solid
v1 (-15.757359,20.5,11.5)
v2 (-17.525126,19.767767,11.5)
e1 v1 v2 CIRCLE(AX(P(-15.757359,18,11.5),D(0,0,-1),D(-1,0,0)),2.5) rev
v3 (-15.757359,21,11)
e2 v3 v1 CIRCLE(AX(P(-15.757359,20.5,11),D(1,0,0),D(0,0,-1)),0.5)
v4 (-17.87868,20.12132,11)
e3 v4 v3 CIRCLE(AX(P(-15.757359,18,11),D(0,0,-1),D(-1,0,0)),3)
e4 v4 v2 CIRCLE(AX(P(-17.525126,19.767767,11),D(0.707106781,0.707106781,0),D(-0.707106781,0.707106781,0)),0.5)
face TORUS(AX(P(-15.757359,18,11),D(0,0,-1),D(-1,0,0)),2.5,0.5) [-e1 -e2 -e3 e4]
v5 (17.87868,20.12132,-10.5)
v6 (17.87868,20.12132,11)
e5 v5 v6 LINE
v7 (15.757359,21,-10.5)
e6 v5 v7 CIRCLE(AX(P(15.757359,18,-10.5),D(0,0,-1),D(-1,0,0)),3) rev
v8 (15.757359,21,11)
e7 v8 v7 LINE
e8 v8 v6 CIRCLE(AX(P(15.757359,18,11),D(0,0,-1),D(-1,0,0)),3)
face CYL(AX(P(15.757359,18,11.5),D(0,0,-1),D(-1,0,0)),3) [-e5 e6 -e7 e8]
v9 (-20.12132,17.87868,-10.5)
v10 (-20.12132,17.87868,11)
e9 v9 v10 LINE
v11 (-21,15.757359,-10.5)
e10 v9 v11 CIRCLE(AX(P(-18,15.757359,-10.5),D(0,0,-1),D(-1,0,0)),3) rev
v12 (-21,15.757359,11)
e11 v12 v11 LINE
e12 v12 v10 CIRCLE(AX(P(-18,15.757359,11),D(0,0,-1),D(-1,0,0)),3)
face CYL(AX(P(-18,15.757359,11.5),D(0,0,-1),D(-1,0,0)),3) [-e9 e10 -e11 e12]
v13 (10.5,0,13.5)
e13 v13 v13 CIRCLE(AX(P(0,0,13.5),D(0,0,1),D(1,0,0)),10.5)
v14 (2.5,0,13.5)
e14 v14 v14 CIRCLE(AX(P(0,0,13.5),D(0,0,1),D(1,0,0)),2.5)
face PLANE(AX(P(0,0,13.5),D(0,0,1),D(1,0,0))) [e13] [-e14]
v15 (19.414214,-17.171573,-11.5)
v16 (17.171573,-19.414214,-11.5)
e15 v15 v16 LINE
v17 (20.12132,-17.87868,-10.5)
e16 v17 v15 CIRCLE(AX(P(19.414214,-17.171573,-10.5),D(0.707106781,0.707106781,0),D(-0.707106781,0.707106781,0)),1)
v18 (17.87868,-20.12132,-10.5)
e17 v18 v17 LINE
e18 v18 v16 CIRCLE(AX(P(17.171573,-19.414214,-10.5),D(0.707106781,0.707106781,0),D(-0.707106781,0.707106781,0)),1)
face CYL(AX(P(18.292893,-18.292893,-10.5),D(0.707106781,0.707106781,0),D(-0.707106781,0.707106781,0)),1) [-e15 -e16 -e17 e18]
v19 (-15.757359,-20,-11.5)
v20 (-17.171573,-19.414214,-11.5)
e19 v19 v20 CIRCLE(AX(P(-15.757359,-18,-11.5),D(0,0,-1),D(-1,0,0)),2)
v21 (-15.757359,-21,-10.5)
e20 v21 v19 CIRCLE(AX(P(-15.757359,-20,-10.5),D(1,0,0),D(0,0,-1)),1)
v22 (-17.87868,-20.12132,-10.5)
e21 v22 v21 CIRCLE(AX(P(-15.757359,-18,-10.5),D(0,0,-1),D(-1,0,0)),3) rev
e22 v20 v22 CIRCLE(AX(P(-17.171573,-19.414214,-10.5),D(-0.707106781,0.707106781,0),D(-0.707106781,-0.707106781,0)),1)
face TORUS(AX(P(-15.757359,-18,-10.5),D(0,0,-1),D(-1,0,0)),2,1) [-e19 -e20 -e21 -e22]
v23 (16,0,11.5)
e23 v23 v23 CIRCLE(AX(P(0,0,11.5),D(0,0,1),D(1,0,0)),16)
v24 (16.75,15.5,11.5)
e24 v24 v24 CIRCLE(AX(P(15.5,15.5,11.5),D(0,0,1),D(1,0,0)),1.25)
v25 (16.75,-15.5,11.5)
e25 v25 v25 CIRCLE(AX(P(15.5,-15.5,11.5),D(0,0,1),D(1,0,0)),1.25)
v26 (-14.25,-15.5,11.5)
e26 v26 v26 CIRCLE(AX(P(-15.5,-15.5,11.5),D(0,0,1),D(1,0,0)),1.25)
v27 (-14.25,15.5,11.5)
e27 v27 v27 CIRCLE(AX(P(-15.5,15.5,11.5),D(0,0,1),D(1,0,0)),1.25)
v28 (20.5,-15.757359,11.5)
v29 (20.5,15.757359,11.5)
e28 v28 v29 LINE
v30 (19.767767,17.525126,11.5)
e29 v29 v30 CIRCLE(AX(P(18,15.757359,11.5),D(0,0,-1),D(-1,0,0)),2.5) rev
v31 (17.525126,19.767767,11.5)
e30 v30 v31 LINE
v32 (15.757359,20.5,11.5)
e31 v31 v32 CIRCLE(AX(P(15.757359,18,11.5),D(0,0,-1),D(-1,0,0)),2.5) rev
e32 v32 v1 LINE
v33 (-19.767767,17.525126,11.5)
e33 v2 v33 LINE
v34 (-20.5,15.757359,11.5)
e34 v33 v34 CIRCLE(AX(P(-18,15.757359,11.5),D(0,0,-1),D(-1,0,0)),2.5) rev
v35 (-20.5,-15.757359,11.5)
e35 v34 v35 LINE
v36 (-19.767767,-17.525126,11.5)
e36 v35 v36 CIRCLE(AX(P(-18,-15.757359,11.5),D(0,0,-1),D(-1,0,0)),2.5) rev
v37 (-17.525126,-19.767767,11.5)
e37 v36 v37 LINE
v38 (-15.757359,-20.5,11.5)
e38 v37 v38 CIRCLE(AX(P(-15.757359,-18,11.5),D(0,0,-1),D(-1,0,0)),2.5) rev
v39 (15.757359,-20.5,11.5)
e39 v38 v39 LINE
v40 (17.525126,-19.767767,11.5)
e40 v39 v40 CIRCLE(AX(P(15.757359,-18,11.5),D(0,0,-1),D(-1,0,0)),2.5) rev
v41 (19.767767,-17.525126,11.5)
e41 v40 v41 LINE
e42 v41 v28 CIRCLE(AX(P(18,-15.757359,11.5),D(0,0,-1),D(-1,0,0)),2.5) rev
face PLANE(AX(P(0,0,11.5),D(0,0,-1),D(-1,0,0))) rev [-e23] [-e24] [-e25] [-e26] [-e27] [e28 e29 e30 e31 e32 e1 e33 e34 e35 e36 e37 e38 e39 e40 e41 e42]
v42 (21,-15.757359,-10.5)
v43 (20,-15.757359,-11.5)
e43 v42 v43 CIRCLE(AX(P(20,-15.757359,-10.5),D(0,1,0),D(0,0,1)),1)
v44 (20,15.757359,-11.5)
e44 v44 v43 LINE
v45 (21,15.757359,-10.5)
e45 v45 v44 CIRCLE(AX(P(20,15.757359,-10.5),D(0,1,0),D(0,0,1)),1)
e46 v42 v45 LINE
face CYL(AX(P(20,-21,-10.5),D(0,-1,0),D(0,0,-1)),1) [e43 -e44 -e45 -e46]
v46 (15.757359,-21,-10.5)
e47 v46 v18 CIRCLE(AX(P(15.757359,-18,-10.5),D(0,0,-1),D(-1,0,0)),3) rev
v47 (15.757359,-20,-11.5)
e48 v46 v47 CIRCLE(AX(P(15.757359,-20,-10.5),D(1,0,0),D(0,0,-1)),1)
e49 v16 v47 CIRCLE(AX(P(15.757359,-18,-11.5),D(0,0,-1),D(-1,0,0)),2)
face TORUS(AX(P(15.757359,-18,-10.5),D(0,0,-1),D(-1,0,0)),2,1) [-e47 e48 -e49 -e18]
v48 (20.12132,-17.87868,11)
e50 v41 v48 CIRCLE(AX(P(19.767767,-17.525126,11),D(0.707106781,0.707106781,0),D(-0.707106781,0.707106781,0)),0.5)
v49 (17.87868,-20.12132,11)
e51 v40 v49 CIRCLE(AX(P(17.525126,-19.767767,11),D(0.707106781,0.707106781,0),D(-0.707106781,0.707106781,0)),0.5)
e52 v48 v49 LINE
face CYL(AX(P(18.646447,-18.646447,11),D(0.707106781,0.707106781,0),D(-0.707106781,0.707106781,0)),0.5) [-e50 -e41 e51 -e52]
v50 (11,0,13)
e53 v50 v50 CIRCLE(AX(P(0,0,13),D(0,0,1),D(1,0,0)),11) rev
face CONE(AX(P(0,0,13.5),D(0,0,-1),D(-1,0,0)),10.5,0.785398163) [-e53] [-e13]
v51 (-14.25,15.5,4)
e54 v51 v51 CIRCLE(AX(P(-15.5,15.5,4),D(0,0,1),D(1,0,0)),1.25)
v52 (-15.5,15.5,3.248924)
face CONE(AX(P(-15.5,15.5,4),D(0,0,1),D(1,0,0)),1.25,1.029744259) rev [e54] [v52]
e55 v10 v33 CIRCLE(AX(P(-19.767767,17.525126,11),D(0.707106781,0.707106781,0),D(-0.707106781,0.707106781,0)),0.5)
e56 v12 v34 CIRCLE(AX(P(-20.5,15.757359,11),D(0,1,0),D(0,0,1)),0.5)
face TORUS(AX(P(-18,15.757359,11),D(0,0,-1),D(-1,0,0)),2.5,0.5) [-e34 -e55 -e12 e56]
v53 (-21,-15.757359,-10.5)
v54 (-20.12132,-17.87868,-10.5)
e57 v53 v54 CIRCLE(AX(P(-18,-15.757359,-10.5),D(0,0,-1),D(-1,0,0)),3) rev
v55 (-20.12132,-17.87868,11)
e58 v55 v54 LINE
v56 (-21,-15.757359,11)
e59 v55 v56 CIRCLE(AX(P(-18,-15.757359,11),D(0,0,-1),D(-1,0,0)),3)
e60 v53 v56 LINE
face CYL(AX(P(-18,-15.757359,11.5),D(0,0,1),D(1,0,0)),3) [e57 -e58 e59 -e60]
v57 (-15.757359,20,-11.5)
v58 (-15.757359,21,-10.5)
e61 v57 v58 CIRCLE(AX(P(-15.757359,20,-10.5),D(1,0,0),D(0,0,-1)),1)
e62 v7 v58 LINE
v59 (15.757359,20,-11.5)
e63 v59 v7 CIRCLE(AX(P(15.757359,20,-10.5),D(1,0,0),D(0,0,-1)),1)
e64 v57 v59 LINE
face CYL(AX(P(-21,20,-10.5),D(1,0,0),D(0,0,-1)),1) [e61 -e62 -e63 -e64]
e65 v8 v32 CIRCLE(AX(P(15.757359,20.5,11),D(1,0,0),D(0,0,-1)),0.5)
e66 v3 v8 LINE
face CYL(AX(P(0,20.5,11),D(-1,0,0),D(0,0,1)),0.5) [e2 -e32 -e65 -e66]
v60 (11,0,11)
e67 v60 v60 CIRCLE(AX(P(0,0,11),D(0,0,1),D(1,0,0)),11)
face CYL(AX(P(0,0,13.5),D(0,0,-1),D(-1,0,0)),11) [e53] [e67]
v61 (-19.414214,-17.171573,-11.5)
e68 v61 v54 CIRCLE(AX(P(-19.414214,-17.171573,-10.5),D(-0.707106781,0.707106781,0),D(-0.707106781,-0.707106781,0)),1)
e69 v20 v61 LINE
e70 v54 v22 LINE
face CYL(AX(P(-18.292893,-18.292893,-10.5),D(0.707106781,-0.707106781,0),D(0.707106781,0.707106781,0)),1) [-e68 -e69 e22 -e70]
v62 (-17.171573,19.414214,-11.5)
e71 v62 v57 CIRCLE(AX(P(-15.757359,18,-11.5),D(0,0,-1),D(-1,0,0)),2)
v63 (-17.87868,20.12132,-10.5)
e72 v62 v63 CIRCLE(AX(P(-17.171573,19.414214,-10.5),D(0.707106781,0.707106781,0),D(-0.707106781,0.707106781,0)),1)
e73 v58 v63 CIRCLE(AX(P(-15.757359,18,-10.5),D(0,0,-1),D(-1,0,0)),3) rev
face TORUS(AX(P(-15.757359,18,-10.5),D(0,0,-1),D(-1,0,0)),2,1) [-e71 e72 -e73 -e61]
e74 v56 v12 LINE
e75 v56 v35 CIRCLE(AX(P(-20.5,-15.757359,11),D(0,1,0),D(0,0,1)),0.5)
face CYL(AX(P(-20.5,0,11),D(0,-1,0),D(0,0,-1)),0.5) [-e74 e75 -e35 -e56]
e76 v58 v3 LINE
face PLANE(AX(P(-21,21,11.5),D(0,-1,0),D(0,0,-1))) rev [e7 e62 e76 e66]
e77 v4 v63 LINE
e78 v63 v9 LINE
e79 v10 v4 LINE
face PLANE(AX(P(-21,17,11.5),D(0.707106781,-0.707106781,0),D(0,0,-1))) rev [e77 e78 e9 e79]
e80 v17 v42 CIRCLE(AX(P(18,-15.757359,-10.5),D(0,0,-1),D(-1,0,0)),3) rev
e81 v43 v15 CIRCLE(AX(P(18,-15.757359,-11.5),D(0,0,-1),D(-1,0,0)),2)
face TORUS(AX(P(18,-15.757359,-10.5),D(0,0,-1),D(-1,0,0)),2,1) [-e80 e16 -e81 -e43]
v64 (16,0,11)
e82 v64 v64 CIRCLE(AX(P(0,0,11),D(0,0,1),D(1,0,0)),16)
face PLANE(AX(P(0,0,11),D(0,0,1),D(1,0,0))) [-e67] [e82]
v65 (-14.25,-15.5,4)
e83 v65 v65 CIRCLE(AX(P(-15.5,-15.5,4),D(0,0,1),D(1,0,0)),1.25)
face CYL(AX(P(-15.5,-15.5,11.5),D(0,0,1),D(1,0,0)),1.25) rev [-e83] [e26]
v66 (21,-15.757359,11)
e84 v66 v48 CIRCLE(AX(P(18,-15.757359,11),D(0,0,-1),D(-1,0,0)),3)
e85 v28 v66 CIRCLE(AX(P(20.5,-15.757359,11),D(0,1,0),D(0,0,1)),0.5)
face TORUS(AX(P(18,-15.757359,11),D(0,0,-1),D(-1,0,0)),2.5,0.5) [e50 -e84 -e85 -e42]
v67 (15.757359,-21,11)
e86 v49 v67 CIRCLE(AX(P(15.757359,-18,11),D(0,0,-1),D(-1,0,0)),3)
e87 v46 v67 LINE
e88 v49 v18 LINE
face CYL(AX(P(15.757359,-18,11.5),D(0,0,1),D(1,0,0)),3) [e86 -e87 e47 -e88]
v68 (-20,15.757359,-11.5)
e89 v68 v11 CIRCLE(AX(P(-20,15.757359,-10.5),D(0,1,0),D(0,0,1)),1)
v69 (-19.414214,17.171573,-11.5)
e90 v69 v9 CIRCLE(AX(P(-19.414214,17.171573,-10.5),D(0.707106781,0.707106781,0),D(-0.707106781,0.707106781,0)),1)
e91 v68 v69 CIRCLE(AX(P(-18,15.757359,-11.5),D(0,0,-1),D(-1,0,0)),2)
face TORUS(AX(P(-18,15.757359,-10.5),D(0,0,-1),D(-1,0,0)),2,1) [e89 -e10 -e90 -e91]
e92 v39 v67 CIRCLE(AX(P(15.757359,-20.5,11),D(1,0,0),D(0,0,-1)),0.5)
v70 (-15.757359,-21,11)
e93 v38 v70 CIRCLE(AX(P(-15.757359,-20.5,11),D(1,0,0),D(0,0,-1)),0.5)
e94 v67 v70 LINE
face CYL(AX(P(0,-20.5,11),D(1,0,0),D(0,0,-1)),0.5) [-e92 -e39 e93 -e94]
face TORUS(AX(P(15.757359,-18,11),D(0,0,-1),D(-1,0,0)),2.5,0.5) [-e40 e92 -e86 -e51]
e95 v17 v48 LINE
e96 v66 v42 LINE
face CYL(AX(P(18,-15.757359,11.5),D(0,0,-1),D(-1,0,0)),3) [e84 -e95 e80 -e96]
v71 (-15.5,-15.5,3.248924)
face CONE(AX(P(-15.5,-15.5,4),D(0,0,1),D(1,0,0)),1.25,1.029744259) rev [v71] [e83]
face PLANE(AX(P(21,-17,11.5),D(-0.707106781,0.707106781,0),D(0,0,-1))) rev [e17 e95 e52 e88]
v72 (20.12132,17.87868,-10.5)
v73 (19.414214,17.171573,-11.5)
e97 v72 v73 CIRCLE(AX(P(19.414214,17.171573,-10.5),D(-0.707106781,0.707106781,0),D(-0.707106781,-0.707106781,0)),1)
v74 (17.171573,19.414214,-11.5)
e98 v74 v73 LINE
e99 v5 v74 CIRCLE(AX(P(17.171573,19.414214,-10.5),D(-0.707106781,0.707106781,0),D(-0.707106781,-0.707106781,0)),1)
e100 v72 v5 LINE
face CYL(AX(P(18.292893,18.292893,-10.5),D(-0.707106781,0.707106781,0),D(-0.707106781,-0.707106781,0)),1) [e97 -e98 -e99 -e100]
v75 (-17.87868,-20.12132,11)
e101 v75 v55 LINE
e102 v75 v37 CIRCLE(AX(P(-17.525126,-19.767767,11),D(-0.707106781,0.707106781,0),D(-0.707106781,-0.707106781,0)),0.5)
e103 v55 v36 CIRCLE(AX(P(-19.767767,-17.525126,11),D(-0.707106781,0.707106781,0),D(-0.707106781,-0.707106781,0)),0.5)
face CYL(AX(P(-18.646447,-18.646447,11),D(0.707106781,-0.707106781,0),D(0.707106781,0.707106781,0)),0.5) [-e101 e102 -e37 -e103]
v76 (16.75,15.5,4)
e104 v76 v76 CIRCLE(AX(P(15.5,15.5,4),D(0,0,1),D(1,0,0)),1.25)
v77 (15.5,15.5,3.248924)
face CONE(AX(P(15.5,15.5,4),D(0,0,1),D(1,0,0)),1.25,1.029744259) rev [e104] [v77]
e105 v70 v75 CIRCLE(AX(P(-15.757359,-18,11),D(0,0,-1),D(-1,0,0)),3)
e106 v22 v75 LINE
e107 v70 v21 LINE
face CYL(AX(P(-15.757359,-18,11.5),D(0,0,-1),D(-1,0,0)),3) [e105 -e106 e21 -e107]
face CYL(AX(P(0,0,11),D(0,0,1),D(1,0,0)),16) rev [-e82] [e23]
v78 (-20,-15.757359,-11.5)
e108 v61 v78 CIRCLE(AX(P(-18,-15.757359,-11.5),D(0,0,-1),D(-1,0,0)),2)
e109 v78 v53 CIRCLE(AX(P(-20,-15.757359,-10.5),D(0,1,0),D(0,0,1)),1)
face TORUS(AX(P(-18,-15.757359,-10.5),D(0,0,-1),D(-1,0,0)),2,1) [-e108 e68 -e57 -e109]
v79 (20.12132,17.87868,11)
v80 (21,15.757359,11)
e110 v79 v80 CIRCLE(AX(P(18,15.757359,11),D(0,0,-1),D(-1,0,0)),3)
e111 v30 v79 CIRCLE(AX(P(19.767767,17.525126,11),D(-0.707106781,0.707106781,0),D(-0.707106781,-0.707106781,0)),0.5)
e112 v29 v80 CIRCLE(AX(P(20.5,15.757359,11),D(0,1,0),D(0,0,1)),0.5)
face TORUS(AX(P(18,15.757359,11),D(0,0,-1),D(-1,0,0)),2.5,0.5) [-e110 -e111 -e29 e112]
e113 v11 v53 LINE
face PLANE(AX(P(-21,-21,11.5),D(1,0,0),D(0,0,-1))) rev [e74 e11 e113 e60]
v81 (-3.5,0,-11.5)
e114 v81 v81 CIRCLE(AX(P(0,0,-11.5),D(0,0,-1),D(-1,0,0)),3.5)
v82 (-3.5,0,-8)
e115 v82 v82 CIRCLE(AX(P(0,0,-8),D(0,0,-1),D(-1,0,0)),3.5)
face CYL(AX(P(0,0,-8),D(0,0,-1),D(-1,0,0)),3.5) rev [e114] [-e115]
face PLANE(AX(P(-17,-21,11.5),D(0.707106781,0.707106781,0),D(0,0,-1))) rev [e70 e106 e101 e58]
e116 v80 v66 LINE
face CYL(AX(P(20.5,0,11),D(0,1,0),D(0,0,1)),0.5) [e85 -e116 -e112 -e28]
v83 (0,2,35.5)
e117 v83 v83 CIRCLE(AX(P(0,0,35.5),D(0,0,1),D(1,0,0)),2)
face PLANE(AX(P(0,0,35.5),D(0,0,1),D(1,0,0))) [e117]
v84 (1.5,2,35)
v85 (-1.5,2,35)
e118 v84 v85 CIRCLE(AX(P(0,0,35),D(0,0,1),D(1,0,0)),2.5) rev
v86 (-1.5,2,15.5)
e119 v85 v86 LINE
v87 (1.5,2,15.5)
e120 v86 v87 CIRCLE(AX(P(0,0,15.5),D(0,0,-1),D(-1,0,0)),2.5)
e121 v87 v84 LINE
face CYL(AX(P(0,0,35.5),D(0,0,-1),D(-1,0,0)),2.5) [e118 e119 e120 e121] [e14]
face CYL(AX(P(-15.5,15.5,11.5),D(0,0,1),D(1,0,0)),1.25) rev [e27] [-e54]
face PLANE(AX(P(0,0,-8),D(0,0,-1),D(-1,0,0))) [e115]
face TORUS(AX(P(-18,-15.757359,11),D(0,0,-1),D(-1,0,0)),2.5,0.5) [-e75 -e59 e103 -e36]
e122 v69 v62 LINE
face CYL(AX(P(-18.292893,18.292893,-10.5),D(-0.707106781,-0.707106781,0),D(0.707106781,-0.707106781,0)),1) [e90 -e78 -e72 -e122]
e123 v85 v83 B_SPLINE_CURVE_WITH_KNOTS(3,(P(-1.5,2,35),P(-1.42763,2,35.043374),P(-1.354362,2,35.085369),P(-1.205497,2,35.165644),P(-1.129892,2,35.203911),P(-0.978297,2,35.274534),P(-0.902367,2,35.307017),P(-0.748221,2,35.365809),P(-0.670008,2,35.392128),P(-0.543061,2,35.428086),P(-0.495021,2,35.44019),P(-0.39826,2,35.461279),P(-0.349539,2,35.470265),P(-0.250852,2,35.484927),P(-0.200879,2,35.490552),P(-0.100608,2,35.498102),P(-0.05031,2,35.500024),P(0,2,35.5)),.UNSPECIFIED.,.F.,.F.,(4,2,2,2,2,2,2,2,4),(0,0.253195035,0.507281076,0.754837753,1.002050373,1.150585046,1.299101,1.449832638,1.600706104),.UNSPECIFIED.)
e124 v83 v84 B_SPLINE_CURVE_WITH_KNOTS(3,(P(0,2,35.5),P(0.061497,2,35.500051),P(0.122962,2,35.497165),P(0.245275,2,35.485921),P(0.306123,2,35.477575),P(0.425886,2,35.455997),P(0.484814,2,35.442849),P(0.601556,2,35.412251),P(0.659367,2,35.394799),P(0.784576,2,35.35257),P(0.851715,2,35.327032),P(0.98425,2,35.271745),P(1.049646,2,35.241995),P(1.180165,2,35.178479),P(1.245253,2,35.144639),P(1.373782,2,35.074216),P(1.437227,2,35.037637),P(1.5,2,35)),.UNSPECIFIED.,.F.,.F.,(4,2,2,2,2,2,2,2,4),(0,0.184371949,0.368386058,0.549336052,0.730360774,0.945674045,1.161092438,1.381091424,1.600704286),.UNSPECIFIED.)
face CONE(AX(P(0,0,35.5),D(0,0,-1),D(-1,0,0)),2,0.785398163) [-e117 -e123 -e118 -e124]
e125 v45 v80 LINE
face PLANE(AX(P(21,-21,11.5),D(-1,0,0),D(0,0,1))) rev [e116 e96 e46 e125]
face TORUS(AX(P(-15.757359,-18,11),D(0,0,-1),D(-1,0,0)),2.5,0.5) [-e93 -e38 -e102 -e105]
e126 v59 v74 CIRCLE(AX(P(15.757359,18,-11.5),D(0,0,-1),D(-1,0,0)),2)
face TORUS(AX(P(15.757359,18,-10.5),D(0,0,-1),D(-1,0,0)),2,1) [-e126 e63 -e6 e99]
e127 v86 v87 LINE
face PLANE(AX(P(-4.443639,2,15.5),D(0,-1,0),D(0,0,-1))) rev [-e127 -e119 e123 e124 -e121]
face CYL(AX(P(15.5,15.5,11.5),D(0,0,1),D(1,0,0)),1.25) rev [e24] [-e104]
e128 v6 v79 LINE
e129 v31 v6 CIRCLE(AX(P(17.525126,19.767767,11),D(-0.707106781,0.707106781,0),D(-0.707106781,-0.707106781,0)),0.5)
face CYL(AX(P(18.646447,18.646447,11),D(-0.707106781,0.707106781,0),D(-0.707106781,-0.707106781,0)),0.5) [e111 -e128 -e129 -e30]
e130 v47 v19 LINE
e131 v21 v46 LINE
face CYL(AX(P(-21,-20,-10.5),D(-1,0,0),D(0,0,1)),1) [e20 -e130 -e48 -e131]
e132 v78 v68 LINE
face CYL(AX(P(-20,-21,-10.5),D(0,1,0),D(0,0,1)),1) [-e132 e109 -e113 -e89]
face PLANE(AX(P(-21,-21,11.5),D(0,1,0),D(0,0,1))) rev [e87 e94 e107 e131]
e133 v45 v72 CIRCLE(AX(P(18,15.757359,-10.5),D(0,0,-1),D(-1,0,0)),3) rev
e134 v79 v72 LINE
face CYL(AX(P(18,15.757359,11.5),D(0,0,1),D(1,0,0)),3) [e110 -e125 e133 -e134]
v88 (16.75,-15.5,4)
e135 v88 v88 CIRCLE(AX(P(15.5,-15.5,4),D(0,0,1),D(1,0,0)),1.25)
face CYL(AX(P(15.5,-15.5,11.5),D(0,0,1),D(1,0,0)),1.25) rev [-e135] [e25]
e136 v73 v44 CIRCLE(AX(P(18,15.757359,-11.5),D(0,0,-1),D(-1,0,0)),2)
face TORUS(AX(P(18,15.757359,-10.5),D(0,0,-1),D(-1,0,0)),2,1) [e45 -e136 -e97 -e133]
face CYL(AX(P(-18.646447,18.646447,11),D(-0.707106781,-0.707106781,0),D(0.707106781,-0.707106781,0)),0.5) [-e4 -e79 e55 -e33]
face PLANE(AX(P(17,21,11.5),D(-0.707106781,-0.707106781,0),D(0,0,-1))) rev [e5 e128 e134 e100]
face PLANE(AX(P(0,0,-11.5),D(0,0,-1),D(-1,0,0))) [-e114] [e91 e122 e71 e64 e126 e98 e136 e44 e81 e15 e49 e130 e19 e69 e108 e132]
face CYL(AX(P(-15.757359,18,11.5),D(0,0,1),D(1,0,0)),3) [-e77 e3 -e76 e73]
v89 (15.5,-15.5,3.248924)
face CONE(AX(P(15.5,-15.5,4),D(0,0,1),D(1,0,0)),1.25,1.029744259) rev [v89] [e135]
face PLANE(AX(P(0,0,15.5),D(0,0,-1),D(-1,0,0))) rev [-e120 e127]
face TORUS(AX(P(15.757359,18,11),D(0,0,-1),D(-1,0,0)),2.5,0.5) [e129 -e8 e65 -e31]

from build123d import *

# Parameters (mm, degrees)
SKETCH1_W           = 42
SKETCH1_H           = 42
BOSS_EXTRUDE1_DEPTH = 11.5
CHAMFER1_SIZE       = 4
SKETCH2_R           = 11
BOSS_EXTRUDE2_DEPTH = 2
CUT_EXTRUDE1_START  = -0.5
SKETCH3_R           = 16
SKETCH3_R_2         = 11
CUT_EXTRUDE1_DEPTH  = 0.5
SKETCH4_R           = 2.5
BOSS_EXTRUDE3_DEPTH = 22
SKETCH5_W           = 10.364275964
SKETCH5_H           = 1.526028363
CUT_EXTRUDE2_DEPTH  = 20
CIRPATTERN1_COUNT   = 4
FILLET1_R           = 3
CHAMFER2_SIZE       = 0.5
FILLET2_R           = 1
FILLET3_R           = 0.5
SKETCH9_R           = 3.5
CUT_EXTRUDE3_DEPTH  = 3.5


with BuildPart() as part:
    # Sketch1 → Boss-Extrude1 (new, symmetric)
    with BuildSketch(Plane.XY):
        Rectangle(SKETCH1_W, SKETCH1_H)
    extrude(amount=BOSS_EXTRUDE1_DEPTH, both=True)

    # Chamfer1
    chamfer1_edges = [part.edges().sort_by_distance(p)[0] for p in [
        (21, -21, 0),
        (-21, -21, 0),
        (-21, 21, 0),
        (21, 21, 0),
    ]]
    chamfer(chamfer1_edges, length=CHAMFER1_SIZE)

    # Sketch2 → Boss-Extrude2 (add)
    with BuildSketch(Plane.XY.offset(11.5)):
        with Locations(Location((0, 0, 0), (0, 0, 180))):
            Circle(SKETCH2_R)
    extrude(amount=BOSS_EXTRUDE2_DEPTH)

    # Sketch3 → Cut-Extrude1 (cut)
    with BuildSketch(Plane.XY.offset(11.5).offset(CUT_EXTRUDE1_START)):
        Circle(SKETCH3_R)
        Circle(SKETCH3_R_2, mode=Mode.SUBTRACT)
    extrude(amount=CUT_EXTRUDE1_DEPTH, mode=Mode.SUBTRACT)

    # Sketch4 → Boss-Extrude3 (add)
    with BuildSketch(Plane.XY.offset(13.5)):
        Circle(SKETCH4_R)
    extrude(amount=BOSS_EXTRUDE3_DEPTH)

    # Sketch5 → Cut-Extrude2 (cut)
    with BuildSketch(Plane.XY.offset(35.5)):
        with Locations((0.738499094, 2.763014181)):
            Rectangle(SKETCH5_W, SKETCH5_H)
    extrude(amount=-CUT_EXTRUDE2_DEPTH, mode=Mode.SUBTRACT)

    # Sketch7 → M3x0.5 Tapped Hole1 (revolve, cut)
    with BuildSketch(Plane(origin=(-15.5, 15.5, 11.5), x_dir=(0, -1, 0), z_dir=(1, 0, 0))):
        Polygon((0, 0), (0, 8.251075774), (1.25, 7.5), (1.25, 0), align=None)
    m3x0_5_tapped_hole1 = revolve(axis=Axis((-15.5, 15.5, 17.85), (0, 0, -1)), mode=Mode.SUBTRACT)

    # CirPattern1: M3x0.5 Tapped Hole1 ×4 about axis
    cirpattern1_axis = Axis((0, 0, 0), (0, 0, 1))
    for i in range(1, CIRPATTERN1_COUNT):
        add(m3x0_5_tapped_hole1.rotate(cirpattern1_axis, i * 360 / CIRPATTERN1_COUNT), mode=Mode.SUBTRACT)

    # Fillet1
    fillet1_edges = [part.edges().sort_by_distance(p)[0] for p in [
        (17, -21, 0),
        (-17, -21, 0),
        (-21, 17, 0),
        (-21, -17, 0),
        (21, 17, 0),
        (21, -17, 0),
        (17, 21, 0),
        (-17, 21, 0),
    ]]
    fillet(fillet1_edges, radius=FILLET1_R)

    # Chamfer2
    chamfer2_edges = [part.edges().sort_by_distance(p)[0] for p in [
        (-1.118033989, -2.236067977, 35.5),
        (11, 0, 13.5),
    ]]
    chamfer(chamfer2_edges, length=CHAMFER2_SIZE - 0.0001)  # a hair under: the kernel refuses the full size

    # Fillet2
    fillet2_edges = [part.edges().sort_by_distance(p)[0] for p in [
        (-19, -19, -11.5),
        (0, -21, -11.5),
        (-19, 19, -11.5),
        (0, 21, -11.5),
        (19, 19, -11.5),
        (21, 0, -11.5),
        (19, -19, -11.5),
        (-16.90540961, 20.771638598, -11.5),
        (-20.771638598, 16.90540961, -11.5),
        (16.90540961, 20.771638598, -11.5),
        (20.771638598, 16.90540961, -11.5),
        (20.771638598, -16.90540961, -11.5),
        (16.90540961, -20.771638598, -11.5),
        (-16.90540961, -20.771638598, -11.5),
        (-20.771638598, -16.90540961, -11.5),
        (-21, 0, -11.5),
    ]]
    fillet(fillet2_edges, radius=FILLET2_R)

    # Fillet3
    fillet3_edges = [part.edges().sort_by_distance(p)[0] for p in [
        (-20.771638598, 16.90540961, 11.5),
        (16.90540961, 20.771638598, 11.5),
        (20.771638598, 16.90540961, 11.5),
        (20.771638598, -16.90540961, 11.5),
        (16.90540961, -20.771638598, 11.5),
        (-16.90540961, -20.771638598, 11.5),
        (-20.771638598, -16.90540961, 11.5),
        (-21, 0, 11.5),
        (-19, -19, 11.5),
        (0, -21, 11.5),
        (19, -19, 11.5),
        (21, 0, 11.5),
        (19, 19, 11.5),
        (0, 21, 11.5),
        (-19, 19, 11.5),
        (-16.90540961, 20.771638598, 11.5),
    ]]
    fillet(fillet3_edges, radius=FILLET3_R)

    # Sketch9 → Cut-Extrude3 (cut)
    with BuildSketch(Plane(origin=(0, 0, -11.5), x_dir=(-1, 0, 0), z_dir=(0, 0, -1))):
        Circle(SKETCH9_R)
    extrude(amount=-CUT_EXTRUDE3_DEPTH, mode=Mode.SUBTRACT)


solid = part.part
